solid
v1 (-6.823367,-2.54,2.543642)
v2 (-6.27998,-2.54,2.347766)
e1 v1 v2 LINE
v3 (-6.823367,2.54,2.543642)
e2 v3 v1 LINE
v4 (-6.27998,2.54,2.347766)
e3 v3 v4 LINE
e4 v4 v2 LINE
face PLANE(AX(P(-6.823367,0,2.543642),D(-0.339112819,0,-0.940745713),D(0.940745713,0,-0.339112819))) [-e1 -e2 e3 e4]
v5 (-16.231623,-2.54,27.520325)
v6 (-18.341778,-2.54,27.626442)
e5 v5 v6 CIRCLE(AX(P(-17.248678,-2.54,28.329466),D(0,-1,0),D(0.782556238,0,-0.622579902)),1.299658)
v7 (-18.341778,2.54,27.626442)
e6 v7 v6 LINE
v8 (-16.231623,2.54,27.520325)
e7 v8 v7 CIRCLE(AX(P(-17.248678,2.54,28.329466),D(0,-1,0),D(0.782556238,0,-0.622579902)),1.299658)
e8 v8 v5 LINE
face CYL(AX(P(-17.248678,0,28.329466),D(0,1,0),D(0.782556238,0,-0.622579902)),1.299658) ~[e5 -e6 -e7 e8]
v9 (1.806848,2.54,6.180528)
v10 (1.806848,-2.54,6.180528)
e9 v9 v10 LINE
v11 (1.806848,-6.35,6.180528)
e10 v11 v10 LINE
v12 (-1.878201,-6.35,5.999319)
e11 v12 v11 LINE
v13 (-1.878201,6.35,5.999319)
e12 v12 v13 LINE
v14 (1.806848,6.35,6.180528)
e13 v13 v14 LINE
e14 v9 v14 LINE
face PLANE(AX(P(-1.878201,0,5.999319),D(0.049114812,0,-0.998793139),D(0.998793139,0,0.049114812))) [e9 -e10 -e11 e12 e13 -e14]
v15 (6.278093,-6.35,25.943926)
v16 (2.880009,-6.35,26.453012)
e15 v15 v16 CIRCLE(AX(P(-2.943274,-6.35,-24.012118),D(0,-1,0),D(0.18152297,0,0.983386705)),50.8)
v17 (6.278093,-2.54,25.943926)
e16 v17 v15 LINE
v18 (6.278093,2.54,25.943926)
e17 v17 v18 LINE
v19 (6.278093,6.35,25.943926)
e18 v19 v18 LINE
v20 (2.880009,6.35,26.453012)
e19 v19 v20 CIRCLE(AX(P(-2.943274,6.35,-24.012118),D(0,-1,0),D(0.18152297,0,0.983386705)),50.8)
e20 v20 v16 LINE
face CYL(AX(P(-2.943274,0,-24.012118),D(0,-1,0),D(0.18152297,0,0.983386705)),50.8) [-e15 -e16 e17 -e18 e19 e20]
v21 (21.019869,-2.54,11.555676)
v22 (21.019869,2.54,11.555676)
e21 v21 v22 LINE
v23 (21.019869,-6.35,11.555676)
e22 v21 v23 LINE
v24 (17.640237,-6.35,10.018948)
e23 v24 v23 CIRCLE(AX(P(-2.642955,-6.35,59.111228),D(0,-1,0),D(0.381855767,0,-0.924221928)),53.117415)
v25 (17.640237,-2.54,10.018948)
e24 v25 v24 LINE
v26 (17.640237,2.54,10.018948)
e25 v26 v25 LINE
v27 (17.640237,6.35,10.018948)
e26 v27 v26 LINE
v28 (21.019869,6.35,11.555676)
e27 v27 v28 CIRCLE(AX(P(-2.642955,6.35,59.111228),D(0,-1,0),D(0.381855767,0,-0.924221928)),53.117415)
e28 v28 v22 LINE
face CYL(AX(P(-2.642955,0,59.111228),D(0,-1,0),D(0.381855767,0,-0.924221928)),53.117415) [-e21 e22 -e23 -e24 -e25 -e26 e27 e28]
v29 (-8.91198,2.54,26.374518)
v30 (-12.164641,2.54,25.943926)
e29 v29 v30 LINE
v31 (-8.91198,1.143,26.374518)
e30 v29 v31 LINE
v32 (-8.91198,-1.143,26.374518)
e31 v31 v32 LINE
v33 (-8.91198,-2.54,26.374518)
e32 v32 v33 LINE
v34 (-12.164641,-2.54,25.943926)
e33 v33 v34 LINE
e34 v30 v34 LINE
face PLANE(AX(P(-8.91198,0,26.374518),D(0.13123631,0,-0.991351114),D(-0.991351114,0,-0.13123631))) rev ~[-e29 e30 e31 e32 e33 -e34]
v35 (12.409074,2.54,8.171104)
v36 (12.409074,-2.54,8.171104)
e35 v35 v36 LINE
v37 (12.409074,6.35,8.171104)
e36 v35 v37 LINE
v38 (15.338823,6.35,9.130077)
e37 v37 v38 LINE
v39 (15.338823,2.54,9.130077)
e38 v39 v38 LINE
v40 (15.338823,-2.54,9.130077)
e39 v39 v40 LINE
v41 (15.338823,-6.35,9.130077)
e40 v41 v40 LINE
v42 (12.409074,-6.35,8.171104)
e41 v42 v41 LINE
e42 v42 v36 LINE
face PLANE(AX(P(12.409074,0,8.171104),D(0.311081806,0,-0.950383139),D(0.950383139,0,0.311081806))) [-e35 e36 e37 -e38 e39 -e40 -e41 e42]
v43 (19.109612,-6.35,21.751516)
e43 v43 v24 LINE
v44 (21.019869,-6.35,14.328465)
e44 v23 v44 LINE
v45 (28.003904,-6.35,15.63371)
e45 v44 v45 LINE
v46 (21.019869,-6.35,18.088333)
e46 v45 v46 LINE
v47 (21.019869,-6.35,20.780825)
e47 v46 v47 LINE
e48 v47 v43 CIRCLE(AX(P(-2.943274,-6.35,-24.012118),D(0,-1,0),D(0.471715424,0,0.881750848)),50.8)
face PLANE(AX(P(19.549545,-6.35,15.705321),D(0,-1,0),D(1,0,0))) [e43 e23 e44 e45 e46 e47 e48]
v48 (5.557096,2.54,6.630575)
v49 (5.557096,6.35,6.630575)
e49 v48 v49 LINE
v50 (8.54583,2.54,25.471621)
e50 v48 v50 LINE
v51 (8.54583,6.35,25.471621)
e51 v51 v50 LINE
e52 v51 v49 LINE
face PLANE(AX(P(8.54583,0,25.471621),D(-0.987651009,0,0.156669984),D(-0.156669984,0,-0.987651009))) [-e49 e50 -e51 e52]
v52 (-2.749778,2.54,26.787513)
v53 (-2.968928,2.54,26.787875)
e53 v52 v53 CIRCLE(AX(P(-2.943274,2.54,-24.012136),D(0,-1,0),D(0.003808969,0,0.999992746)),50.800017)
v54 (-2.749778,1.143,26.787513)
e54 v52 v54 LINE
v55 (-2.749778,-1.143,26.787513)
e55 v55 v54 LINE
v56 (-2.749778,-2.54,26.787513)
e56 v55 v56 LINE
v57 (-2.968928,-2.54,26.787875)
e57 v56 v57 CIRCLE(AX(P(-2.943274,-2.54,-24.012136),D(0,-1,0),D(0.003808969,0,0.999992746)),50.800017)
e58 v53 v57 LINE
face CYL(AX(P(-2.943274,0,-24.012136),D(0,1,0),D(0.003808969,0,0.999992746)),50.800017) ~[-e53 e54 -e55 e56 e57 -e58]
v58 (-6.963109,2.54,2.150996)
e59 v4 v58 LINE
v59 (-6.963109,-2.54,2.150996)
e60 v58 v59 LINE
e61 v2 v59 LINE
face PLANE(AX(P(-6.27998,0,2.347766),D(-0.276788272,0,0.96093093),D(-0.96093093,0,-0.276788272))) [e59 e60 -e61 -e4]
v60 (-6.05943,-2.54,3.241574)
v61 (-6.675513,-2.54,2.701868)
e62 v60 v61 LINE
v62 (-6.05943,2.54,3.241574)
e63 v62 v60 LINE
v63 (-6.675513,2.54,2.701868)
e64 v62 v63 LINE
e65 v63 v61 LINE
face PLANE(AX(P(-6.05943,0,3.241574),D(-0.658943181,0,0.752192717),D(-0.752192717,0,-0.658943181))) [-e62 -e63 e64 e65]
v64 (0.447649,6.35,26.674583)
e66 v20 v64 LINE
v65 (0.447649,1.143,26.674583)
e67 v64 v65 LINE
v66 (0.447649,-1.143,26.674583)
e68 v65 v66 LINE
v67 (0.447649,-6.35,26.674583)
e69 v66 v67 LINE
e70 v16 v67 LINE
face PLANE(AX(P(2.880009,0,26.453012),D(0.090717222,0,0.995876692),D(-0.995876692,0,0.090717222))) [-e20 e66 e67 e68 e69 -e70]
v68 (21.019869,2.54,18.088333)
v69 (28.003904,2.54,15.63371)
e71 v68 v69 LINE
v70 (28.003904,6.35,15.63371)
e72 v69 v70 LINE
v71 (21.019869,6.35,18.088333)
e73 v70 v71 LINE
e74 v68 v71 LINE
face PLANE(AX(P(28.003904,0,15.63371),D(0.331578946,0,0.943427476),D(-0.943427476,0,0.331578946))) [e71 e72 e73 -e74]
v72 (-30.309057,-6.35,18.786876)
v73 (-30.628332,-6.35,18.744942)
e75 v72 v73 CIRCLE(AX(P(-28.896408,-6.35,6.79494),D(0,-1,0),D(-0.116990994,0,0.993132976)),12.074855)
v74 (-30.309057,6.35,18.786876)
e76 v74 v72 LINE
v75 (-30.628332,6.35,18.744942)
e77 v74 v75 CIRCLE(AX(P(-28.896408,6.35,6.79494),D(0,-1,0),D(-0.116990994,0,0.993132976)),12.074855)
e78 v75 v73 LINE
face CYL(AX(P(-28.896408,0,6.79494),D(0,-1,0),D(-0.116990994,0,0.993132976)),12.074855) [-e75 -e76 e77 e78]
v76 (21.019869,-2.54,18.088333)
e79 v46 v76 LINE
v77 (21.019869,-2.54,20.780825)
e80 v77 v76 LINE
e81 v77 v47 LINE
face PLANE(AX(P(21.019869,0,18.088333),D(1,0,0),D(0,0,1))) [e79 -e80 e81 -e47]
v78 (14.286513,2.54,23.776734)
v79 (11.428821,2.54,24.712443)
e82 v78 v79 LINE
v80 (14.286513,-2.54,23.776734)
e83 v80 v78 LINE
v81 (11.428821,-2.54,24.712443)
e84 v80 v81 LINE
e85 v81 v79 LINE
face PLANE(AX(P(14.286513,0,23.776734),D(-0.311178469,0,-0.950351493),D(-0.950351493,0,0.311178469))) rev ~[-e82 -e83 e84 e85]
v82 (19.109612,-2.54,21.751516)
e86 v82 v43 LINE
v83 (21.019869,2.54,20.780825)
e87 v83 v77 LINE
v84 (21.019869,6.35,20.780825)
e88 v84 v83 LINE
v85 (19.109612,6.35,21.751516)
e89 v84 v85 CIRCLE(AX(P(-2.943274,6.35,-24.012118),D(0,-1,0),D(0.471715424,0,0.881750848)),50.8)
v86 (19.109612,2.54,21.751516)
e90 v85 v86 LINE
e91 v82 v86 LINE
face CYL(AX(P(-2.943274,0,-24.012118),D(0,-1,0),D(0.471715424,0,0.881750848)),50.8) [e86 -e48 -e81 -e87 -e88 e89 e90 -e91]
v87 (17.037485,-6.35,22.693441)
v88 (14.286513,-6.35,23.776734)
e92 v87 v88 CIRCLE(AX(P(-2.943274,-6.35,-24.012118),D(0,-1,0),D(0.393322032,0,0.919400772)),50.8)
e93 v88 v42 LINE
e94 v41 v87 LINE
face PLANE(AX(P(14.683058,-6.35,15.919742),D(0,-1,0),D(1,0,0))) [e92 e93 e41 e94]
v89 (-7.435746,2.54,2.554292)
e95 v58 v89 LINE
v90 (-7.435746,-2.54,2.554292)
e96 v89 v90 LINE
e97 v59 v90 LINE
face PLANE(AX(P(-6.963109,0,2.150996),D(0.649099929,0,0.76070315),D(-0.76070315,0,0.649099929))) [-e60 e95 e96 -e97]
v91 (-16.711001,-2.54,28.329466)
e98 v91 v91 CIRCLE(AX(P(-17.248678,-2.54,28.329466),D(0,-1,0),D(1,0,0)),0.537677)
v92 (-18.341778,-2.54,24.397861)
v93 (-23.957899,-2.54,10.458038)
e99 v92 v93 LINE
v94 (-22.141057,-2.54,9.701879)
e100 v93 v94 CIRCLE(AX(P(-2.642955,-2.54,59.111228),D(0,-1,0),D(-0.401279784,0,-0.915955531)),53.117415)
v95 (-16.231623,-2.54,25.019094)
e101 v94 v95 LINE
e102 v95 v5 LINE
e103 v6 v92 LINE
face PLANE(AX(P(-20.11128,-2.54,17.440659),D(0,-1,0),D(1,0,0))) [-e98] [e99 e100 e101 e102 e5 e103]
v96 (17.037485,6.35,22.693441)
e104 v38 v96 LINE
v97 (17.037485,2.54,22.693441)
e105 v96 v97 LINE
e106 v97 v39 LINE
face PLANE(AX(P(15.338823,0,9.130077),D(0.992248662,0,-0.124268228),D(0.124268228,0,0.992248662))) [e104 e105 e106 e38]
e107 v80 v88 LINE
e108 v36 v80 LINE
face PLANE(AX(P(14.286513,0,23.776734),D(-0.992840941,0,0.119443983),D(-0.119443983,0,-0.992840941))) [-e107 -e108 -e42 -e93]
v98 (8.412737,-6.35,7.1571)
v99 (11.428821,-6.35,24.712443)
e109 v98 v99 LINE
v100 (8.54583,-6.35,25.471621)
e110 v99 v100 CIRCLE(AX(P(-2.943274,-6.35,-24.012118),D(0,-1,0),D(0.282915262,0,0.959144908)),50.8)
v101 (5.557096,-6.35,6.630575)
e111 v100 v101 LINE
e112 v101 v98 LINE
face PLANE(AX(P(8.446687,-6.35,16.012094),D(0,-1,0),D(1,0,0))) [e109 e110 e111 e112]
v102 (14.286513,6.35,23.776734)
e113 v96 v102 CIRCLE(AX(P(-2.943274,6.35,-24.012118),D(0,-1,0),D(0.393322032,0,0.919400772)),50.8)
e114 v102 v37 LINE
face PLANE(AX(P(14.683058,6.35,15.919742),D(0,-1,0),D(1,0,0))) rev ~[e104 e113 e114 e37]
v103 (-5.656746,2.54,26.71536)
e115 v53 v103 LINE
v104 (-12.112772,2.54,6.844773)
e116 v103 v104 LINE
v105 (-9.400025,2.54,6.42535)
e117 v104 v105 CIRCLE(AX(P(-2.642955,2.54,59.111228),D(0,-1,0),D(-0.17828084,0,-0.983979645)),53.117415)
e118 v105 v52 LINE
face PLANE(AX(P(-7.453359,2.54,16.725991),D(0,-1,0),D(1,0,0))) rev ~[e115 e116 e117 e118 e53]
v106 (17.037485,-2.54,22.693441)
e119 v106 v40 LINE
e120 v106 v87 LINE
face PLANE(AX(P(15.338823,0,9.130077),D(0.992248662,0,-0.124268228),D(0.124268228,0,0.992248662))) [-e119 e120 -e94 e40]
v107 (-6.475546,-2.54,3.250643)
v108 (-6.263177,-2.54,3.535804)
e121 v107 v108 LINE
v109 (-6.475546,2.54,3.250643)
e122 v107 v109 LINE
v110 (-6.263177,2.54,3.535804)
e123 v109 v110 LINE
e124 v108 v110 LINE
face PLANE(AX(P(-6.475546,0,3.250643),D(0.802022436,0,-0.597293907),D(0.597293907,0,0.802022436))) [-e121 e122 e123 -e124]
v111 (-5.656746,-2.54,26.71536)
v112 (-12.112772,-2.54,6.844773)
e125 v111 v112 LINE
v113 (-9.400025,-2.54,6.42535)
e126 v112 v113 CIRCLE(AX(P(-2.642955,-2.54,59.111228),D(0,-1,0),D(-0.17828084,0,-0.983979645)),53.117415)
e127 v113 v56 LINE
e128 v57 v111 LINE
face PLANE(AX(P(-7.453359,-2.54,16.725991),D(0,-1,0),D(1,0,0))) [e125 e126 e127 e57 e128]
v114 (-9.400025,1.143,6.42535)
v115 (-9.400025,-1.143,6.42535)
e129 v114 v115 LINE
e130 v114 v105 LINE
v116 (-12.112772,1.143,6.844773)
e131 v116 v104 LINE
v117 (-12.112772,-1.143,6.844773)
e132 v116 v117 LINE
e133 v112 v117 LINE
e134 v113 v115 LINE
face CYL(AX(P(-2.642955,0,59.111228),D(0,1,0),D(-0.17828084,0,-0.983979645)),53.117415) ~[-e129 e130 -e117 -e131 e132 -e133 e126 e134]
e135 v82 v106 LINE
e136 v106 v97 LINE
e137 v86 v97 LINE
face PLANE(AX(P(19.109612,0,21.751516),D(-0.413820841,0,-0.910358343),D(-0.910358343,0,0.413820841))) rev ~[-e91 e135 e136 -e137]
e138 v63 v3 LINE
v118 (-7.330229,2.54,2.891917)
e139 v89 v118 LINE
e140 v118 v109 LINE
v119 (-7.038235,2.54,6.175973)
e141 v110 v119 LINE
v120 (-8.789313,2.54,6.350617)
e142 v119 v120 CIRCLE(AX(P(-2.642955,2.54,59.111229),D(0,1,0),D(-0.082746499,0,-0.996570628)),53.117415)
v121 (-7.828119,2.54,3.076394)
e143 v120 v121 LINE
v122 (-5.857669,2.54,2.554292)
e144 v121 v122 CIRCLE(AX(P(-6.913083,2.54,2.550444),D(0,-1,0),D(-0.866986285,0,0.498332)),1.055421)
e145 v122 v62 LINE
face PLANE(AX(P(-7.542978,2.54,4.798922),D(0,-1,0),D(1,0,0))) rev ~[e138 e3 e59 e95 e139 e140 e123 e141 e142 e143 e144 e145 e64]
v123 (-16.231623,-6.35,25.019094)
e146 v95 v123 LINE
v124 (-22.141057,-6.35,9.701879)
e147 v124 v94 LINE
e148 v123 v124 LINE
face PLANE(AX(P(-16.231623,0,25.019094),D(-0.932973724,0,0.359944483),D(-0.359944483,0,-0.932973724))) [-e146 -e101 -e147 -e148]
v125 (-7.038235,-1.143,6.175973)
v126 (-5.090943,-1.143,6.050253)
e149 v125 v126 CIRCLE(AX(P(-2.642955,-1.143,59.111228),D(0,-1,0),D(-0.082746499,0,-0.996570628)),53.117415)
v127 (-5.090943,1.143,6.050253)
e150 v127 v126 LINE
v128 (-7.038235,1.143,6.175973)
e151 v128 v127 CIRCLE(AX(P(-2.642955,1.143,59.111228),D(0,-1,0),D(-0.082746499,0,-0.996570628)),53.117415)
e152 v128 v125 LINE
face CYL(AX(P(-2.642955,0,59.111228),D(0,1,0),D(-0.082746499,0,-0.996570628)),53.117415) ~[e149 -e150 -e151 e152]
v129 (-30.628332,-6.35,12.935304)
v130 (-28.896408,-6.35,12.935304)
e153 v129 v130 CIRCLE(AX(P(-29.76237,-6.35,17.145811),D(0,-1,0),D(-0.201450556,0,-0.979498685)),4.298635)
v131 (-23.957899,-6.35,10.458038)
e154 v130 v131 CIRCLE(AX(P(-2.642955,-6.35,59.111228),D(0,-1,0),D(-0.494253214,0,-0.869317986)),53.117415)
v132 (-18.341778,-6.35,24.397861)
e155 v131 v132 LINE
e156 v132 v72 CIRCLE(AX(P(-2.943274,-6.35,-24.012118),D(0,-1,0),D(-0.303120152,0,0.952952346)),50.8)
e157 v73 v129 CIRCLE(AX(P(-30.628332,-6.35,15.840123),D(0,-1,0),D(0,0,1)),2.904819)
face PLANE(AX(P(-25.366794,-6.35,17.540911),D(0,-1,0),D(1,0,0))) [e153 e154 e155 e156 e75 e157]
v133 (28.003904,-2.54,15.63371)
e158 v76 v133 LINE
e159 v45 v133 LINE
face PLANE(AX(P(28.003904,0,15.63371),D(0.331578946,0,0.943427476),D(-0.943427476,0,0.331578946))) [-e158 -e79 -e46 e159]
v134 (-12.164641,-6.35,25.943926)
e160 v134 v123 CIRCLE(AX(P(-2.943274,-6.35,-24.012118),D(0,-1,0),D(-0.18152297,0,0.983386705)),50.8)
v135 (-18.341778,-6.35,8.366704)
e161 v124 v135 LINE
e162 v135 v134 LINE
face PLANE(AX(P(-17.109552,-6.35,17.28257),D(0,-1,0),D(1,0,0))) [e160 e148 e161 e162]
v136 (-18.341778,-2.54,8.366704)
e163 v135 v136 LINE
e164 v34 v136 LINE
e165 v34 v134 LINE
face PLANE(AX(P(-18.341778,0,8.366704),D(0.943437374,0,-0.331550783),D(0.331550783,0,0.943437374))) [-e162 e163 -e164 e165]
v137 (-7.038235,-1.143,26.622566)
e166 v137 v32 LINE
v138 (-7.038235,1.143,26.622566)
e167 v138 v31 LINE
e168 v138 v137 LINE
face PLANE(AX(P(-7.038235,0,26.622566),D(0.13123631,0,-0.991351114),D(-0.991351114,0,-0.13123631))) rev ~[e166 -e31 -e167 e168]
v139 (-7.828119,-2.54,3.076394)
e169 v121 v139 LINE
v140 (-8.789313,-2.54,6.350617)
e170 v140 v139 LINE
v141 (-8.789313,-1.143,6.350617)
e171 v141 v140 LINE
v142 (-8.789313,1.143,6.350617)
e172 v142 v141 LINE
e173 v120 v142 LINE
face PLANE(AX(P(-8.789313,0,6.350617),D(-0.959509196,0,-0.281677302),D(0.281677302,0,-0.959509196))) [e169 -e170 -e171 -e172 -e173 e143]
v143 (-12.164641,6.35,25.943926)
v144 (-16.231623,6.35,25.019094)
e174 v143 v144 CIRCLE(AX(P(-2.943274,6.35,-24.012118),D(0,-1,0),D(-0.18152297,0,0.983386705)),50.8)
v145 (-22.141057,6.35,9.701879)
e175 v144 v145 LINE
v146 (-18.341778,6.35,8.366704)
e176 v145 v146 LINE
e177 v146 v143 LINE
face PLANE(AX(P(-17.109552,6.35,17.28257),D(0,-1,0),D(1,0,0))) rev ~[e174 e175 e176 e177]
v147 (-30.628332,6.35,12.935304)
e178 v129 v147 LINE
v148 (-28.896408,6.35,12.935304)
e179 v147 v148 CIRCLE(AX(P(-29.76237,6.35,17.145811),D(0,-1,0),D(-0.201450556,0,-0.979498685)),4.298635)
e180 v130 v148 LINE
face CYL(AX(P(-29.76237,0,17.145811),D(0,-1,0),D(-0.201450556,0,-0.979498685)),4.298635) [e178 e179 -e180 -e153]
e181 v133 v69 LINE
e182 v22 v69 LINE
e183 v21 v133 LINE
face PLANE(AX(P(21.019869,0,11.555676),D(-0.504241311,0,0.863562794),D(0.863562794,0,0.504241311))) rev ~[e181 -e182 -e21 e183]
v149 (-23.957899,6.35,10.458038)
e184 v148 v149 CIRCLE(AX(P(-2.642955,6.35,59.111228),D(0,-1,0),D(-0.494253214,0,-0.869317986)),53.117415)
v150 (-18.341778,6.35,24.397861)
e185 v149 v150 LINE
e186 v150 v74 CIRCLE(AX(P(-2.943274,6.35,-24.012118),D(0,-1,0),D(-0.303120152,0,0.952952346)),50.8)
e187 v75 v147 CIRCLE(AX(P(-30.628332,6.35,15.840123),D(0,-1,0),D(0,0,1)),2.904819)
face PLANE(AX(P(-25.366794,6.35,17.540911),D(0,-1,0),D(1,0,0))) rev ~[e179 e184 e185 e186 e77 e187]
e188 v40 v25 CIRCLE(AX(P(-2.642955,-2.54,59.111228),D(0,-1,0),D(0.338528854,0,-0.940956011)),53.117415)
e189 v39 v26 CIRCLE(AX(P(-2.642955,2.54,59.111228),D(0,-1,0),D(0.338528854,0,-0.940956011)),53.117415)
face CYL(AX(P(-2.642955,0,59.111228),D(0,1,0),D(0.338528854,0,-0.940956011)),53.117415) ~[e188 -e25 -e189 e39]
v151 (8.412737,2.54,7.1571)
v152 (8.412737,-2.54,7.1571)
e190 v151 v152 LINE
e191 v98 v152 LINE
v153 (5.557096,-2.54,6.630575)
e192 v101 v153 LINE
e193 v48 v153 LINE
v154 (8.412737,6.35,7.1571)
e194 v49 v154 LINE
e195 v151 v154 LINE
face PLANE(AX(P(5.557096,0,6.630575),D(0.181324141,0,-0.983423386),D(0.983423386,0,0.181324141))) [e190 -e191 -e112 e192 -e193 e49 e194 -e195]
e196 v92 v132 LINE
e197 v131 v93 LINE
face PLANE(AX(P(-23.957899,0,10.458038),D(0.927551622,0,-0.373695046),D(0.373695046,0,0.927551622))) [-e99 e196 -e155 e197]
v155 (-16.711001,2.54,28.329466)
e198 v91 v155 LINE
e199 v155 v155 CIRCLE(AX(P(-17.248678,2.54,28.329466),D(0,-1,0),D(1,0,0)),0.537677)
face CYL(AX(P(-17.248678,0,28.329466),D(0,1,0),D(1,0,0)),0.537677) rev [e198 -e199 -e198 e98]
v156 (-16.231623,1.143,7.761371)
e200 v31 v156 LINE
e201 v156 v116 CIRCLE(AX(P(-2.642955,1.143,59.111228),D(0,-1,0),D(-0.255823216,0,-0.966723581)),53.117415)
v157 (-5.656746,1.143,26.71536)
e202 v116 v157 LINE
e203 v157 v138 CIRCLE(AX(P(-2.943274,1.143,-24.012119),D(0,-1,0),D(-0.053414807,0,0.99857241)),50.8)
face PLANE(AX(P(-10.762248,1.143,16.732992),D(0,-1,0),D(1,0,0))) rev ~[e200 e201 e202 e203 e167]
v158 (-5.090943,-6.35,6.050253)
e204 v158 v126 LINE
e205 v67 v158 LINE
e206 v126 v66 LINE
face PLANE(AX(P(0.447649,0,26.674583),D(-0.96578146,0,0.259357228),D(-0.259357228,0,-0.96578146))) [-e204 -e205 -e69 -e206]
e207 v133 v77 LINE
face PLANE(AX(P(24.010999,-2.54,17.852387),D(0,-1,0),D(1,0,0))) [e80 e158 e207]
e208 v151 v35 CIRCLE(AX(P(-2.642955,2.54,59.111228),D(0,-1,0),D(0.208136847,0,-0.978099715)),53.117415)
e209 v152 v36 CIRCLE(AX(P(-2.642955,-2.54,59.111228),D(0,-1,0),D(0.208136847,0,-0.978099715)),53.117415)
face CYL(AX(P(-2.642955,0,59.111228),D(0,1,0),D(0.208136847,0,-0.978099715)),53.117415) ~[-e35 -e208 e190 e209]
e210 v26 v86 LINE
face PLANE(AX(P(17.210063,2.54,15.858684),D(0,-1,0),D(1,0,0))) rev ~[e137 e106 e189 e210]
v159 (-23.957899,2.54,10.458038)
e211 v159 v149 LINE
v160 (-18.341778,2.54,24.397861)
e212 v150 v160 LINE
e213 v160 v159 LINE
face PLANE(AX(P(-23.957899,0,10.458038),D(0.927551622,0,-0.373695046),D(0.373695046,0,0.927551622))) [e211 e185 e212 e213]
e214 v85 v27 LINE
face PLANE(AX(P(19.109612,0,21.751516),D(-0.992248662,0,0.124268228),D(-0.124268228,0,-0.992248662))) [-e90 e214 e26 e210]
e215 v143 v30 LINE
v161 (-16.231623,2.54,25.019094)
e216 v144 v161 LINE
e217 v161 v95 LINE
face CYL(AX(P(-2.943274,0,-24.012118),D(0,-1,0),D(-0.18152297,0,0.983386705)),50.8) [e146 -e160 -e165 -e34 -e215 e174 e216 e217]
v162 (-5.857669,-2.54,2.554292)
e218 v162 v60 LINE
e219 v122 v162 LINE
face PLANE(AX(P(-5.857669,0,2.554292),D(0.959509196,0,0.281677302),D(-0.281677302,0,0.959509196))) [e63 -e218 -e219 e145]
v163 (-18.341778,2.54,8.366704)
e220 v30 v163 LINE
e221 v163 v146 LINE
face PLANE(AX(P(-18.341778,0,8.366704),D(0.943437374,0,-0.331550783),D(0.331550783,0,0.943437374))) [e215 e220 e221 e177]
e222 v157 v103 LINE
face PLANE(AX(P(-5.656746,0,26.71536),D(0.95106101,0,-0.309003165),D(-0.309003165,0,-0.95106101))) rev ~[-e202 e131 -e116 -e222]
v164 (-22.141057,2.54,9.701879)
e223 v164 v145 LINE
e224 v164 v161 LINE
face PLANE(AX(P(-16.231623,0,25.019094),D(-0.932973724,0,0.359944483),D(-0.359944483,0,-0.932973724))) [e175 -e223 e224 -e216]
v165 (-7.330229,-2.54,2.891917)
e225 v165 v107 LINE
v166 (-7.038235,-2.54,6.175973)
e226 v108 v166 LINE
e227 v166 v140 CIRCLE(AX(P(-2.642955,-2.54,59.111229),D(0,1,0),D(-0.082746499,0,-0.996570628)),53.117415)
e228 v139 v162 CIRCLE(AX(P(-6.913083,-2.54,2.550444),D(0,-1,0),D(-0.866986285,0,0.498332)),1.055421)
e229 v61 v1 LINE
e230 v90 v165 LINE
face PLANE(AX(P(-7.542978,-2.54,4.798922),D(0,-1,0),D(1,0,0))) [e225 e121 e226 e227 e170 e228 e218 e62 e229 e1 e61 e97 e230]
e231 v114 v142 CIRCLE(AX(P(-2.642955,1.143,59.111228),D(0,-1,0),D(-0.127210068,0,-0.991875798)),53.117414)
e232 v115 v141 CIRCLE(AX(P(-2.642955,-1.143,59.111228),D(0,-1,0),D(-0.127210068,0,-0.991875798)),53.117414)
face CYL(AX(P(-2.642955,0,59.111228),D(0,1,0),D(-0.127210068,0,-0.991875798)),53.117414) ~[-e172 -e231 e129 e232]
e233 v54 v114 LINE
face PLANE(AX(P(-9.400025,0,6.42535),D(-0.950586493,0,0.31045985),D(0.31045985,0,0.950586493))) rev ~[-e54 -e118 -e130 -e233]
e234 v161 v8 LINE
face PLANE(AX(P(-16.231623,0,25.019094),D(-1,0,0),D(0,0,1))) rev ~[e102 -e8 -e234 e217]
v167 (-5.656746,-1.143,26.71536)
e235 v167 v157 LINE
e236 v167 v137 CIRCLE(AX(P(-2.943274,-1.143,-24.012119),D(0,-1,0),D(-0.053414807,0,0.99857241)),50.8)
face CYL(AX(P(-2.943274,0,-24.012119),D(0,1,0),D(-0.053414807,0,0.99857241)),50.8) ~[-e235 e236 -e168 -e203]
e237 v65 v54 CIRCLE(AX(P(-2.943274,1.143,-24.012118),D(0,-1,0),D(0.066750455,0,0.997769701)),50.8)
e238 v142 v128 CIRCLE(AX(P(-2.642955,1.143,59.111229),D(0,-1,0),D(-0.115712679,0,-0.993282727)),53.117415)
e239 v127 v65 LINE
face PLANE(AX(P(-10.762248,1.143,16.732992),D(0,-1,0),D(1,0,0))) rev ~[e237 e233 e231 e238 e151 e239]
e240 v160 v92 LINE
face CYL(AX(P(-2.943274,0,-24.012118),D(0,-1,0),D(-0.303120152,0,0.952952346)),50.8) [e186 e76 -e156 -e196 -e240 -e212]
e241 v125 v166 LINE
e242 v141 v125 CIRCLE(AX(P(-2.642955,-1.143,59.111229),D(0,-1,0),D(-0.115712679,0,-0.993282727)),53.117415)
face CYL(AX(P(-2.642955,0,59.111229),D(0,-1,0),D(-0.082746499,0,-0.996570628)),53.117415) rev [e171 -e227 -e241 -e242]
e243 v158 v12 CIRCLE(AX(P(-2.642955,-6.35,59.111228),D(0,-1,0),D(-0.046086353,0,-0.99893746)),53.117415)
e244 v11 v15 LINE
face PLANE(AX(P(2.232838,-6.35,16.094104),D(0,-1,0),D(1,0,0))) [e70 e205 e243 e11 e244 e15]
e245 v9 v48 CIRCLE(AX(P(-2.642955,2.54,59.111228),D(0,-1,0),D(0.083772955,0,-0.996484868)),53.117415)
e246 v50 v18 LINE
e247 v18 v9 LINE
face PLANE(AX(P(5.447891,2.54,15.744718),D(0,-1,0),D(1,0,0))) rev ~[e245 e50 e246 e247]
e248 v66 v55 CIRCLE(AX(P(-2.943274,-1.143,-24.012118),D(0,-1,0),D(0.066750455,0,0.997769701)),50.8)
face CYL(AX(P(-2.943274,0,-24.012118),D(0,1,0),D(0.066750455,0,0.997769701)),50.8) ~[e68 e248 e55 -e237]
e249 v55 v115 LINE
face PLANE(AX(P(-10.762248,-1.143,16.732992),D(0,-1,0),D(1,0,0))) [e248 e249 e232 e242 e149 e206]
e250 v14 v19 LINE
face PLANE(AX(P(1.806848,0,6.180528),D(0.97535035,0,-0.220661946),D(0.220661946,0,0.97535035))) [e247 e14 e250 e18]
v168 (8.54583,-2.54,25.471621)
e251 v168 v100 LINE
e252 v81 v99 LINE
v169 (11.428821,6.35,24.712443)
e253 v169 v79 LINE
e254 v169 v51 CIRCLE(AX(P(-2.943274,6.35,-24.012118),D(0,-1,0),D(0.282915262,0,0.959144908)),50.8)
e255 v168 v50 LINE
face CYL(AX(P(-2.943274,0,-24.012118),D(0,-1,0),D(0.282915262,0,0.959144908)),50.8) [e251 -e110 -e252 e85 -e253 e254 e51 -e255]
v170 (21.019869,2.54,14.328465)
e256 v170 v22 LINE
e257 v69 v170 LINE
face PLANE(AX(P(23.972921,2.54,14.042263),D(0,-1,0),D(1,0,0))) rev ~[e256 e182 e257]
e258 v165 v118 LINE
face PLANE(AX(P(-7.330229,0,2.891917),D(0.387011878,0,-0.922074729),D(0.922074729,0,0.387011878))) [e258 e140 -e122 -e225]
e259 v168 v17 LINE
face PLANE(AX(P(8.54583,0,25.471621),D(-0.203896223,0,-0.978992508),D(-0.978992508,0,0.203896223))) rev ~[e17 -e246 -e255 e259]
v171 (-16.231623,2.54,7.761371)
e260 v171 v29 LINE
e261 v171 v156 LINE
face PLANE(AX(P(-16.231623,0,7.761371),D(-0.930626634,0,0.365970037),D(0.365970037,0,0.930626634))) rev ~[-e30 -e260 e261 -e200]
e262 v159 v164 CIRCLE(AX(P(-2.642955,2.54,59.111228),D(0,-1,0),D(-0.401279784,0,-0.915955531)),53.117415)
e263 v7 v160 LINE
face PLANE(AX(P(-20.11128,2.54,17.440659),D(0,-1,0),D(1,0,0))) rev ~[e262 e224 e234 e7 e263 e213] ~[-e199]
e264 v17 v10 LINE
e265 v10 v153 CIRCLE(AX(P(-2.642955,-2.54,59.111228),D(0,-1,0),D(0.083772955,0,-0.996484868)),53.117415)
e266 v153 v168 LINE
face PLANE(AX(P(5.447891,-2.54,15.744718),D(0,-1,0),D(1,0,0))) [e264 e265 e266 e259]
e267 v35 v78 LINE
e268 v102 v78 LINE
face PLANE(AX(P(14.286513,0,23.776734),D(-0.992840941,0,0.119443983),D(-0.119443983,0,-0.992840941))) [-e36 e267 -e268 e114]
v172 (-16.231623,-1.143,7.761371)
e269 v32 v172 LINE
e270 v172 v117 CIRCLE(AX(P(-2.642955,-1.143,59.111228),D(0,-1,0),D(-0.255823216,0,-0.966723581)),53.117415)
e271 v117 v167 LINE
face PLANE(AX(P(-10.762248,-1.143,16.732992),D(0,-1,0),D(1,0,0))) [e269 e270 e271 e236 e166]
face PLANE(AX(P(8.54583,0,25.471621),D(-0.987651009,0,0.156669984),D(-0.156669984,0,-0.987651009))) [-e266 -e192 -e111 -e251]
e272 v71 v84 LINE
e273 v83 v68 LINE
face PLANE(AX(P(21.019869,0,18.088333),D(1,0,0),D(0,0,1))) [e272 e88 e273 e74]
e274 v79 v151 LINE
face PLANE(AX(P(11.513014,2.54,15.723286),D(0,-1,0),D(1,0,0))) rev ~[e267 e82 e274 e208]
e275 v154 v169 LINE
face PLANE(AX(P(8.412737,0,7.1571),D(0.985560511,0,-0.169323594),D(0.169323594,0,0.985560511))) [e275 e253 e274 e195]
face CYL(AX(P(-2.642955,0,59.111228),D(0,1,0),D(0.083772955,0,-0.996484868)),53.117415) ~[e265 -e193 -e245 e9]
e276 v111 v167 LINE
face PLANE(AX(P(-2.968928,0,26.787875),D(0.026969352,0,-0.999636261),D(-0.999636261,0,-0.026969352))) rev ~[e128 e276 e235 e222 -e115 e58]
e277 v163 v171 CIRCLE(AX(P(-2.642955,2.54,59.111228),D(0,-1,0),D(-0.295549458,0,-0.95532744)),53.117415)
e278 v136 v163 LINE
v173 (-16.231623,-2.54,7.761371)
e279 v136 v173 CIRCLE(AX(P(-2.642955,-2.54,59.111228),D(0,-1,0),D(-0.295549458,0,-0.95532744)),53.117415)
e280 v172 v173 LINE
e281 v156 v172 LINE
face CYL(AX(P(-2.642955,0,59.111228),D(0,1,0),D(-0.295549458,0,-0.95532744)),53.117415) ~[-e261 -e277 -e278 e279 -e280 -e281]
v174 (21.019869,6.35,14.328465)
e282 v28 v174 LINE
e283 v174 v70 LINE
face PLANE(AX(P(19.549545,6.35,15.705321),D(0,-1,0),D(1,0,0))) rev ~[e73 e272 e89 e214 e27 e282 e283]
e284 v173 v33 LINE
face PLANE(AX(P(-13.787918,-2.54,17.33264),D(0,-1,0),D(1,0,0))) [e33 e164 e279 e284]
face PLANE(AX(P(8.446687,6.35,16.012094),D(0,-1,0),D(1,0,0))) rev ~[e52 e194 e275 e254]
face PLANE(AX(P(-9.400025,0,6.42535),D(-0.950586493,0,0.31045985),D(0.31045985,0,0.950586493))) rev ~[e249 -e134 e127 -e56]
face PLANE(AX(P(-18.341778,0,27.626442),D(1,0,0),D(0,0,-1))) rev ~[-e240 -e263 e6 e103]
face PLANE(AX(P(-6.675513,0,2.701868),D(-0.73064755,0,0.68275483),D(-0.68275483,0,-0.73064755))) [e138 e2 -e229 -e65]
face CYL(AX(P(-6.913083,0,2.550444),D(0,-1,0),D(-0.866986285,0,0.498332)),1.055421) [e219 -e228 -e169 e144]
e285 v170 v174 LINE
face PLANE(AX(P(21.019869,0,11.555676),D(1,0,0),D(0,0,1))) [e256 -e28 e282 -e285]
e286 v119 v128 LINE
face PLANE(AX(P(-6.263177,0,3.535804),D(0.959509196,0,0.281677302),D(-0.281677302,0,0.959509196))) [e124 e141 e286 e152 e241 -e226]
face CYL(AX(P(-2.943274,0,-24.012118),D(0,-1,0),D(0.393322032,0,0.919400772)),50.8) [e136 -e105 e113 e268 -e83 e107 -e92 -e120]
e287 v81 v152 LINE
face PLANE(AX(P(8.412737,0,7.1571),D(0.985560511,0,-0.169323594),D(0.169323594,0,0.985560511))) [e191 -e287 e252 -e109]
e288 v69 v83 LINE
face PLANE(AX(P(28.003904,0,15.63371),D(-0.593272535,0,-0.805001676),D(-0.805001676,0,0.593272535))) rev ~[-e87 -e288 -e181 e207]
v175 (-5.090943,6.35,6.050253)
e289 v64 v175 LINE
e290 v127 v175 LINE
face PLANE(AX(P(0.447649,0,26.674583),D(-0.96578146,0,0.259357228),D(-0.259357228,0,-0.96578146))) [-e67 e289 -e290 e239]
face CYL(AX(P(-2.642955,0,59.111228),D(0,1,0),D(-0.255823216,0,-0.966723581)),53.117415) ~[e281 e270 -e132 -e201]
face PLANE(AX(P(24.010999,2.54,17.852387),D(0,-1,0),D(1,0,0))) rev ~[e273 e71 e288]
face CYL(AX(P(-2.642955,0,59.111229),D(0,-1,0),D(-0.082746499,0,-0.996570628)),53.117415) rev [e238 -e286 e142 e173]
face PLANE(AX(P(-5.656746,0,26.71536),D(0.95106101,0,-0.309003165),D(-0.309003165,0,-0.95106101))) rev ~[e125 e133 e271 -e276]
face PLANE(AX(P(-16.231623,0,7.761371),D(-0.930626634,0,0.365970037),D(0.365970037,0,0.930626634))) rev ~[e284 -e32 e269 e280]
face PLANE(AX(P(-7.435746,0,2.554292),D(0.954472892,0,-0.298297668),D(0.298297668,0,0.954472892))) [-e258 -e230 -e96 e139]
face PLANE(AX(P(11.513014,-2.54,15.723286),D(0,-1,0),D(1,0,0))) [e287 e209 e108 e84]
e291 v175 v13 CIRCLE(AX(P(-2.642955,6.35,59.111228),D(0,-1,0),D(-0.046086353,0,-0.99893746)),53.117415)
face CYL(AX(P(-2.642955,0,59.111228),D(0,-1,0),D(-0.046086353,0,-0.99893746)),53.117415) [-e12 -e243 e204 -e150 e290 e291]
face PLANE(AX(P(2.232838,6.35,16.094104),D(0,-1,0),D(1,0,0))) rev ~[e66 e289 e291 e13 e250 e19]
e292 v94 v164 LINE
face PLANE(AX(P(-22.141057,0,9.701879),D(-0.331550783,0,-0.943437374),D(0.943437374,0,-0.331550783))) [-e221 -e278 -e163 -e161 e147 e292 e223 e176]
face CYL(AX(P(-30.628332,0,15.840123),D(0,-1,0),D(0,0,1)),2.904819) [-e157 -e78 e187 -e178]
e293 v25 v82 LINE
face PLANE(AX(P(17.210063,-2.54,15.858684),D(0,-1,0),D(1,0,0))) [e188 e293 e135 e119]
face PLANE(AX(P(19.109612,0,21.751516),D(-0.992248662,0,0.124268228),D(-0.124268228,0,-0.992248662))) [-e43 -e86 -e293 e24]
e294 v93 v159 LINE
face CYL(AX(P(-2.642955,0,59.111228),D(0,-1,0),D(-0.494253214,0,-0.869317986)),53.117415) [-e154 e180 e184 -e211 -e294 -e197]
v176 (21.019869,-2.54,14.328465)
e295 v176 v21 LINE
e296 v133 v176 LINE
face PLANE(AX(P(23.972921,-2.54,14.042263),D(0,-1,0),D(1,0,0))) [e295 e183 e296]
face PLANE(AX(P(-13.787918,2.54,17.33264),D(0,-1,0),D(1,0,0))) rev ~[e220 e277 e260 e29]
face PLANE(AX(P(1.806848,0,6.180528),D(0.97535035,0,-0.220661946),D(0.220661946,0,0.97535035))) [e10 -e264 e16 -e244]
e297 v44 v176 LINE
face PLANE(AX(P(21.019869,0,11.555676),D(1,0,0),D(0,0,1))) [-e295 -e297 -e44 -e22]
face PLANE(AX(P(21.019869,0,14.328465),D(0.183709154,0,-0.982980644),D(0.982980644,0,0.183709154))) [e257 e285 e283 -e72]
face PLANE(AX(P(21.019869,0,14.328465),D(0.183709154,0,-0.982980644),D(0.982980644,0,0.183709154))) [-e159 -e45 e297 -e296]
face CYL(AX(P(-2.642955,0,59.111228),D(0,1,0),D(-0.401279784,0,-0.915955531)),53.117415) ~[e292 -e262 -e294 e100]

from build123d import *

# Parameters (mm, degrees)
F1_DEPTH = 6.35
F2_DEPTH = 1.143
F0_R     = 0.5376774343
F3_DEPTH = 2.54


# Not quite as in the source:
# - a feature names something its author has since deleted; it is built from what else it names


with BuildPart() as f1:
    # F0 (on Front) → F1 (new body, symmetric)
    with BuildSketch(Plane.XZ):
        with BuildLine():
            Line((-23.957899441, 10.4580381471), (-18.3417778462, 24.3978608632))
            ThreePointArc((-18.3417778462, 24.3978608632), (-24.508682548, 21.9832418882), (-30.3090570475, 18.7868761299))
            ThreePointArc((-30.3090570475, 18.7868761299), (-30.4688345425, 18.7669734191), (-30.6283324456, 18.7449419699))
            ThreePointArc((-30.6283324456, 18.7449419699), (-33.5331514259, 15.8401229896), (-30.6283324456, 12.9353040093))
            ThreePointArc((-30.6283324456, 12.9353040093), (-29.7623700905, 12.8471763438), (-28.8964077355, 12.9353040093))
            ThreePointArc((-28.8964077355, 12.9353040093), (-26.4593844973, 11.6324177359), (-23.957899441, 10.4580381471))
        make_face()
    extrude(amount=F1_DEPTH, both=True)



with BuildPart() as f1b:
    # F0 (on Front) → F1, piece 2 (new body, symmetric)
    with BuildSketch(Plane.XZ):
        with BuildLine():
            Line((-18.3417778462, 8.3667041198), (-12.1646409942, 25.9439263056))
            ThreePointArc((-12.1646409942, 25.9439263056), (-14.2076271577, 25.5232665303), (-16.2316225469, 25.0190941641))
            Line((-16.2316225469, 25.0190941641), (-22.1410569955, 9.7018790977))
            Line((-22.1410569955, 9.7018790977), (-18.3417778462, 8.3667041198))
        make_face()
    extrude(amount=F1_DEPTH, both=True)


with BuildPart() as f1c:
    # F0 (on Front) → F1, piece 3 (new body, symmetric)
    with BuildSketch(Plane.XZ):
        with BuildLine():
            Line((1.8068482134, 6.1805279437), (6.278092768, 25.9439263056))
            ThreePointArc((6.278092768, 25.9439263056), (4.5833562732, 26.2272072808), (2.8800089407, 26.4530119809))
            Line((2.8800089407, 26.4530119809), (-1.8782013648, 5.999318733))
            Line((-1.8782013648, 5.999318733), (1.8068482134, 6.1805279437))
        make_face()
        with BuildLine():
            Line((-1.8782013648, 5.999318733), (2.8800089407, 26.4530119809))
            Line((2.8800089407, 26.4530119809), (0.4476490102, 26.6745825214))
            Line((0.4476490102, 26.6745825214), (-5.0909425313, 6.0502526163))
            ThreePointArc((-5.0909425313, 6.0502526163), (-3.4849571687, 6.0004872294), (-1.8782013648, 5.999318733))
        make_face()
    extrude(amount=F1_DEPTH, both=True)


with BuildPart() as f1d:
    # F0 (on Front) → F1, piece 4 (new body, symmetric)
    with BuildSketch(Plane.XZ):
        with BuildLine():
            Line((8.4127366642, 7.1570997269), (11.4288211982, 24.7124430234))
            ThreePointArc((11.4288211982, 24.7124430234), (9.992896211, 25.1131857412), (8.5458304529, 25.4716212117))
            Line((8.5458304529, 25.4716212117), (5.5570962218, 6.6305751818))
            Line((5.5570962218, 6.6305751818), (8.4127366642, 7.1570997269))
        make_face()
    extrude(amount=F1_DEPTH, both=True)


with BuildPart() as f1e:
    # F0 (on Front) → F1, piece 5 (new body, symmetric)
    with BuildSketch(Plane.XZ):
        with BuildLine():
            Line((15.3388230563, 9.1300772804), (17.0374851182, 22.6934409017))
            ThreePointArc((17.0374851182, 22.6934409017), (15.6698818595, 23.2551052755), (14.2865132328, 23.7767342476))
            Line((14.2865132328, 23.7767342476), (12.4090739429, 8.1711044117))
            Line((12.4090739429, 8.1711044117), (15.3388230563, 9.1300772804))
        make_face()
    extrude(amount=F1_DEPTH, both=True)


with BuildPart() as f1f:
    # F0 (on Front) → F1, piece 6 (new body, symmetric)
    with BuildSketch(Plane.XZ):
        with BuildLine():
            Line((21.0198694331, 18.0883333087), (21.0198694322, 20.7808247964))
            ThreePointArc((21.0198694322, 20.7808247964), (20.069859076, 21.2762433466), (19.1096116707, 21.7515160445))
            Line((19.1096116707, 21.7515160445), (17.6402366731, 10.0189484933))
            ThreePointArc((17.6402366731, 10.0189484933), (19.3434832269, 10.757776133), (21.0198694351, 11.5556761172))
            Line((21.0198694351, 11.5556761172), (21.0198694343, 14.3284648657))
            Line((21.0198694343, 14.3284648657), (21.0198694331, 18.0883333087))
        make_face()
        Polygon((21.0198694343, 14.3284648657), (28.0039037731, 15.6337103452), (21.0198694331, 18.0883333087), align=None)
    extrude(amount=F1_DEPTH, both=True)


with BuildPart() as f1_1:
    add(f1.part)

    add(f1b.part)  # F2 merges F1b

    add(f1c.part)  # F2 merges F1c

    add(f1d.part)  # F2 merges F1d

    add(f1e.part)  # F2 merges F1e

    add(f1f.part)  # F2 merges F1f
    # F0 (on Front) → F2 (join, symmetric)
    with BuildSketch(Plane.XZ):
        with BuildLine():
            Line((-12.1127719974, 6.8447730539), (-5.6567463208, 26.7153601349))
            ThreePointArc((-5.6567463208, 26.7153601349), (-6.3478066879, 26.6736702184), (-7.0382347309, 26.6225664263))
            Line((-7.0382347309, 26.6225664263), (-8.9119801903, 26.3745176413))
            Line((-8.9119801903, 26.3745176413), (-16.2316225469, 7.7613705689))
            ThreePointArc((-16.2316225469, 7.7613705689), (-14.1813025903, 7.2621558762), (-12.1127719974, 6.8447730539))
        make_face()
        with BuildLine():
            Line((-5.0909425313, 6.0502526163), (0.4476490102, 26.6745825214))
            ThreePointArc((0.4476490102, 26.6745825214), (-1.1501754418, 26.7562261377), (-2.7497784488, 26.787513187))
            Line((-2.7497784488, 26.787513187), (-9.4000246121, 6.4253498282))
            ThreePointArc((-9.4000246121, 6.4253498282), (-9.0947770245, 6.3870993561), (-8.7893130258, 6.3506173901))
            ThreePointArc((-8.7893130258, 6.3506173901), (-7.91449717, 6.2560428931), (-7.0382347309, 6.1759725811))
            ThreePointArc((-7.0382347309, 6.1759725811), (-6.0651659933, 6.1041697642), (-5.0909425313, 6.0502526163))
        make_face()
        with BuildLine():
            Line((-9.4000246121, 6.4253498282), (-2.7497784488, 26.787513187))
            ThreePointArc((-2.7497784488, 26.787513187), (-2.8593531847, 26.7878123797), (-2.968928311, 26.7878752202))
            Line((-2.968928311, 26.7878752202), (-5.6567463208, 26.7153601349))
            Line((-5.6567463208, 26.7153601349), (-12.1127719974, 6.8447730539))
            ThreePointArc((-12.1127719974, 6.8447730539), (-10.7591081046, 6.6175349855), (-9.4000246121, 6.4253498282))
        make_face()
        with BuildLine():
            ThreePointArc((-18.3417778462, 8.3667041198), (-17.2898277228, 8.0531349816), (-16.2316225469, 7.7613705689))
            Line((-16.2316225469, 7.7613705689), (-8.9119801903, 26.3745176413))
            Line((-8.9119801903, 26.3745176413), (-12.1646409942, 25.9439263056))
            Line((-12.1646409942, 25.9439263056), (-18.3417778462, 8.3667041198))
        make_face()
        with BuildLine():
            Line((5.5570962218, 6.6305751818), (8.5458304529, 25.4716212117))
            Line((8.5458304529, 25.4716212117), (6.278092768, 25.9439263056))
            Line((6.278092768, 25.9439263056), (1.8068482134, 6.1805279437))
            ThreePointArc((1.8068482134, 6.1805279437), (3.6859738146, 6.3722062161), (5.5570962218, 6.6305751818))
        make_face()
        with BuildLine():
            Line((12.4090739429, 8.1711044117), (14.2865132328, 23.7767342476))
            Line((14.2865132328, 23.7767342476), (11.4288211982, 24.7124430234))
            Line((11.4288211982, 24.7124430234), (8.4127366642, 7.1570997269))
            ThreePointArc((8.4127366642, 7.1570997269), (10.4207473928, 7.62531299), (12.4090739429, 8.1711044117))
        make_face()
        with BuildLine():
            Line((17.6402366731, 10.0189484933), (19.1096116707, 21.7515160445))
            Line((19.1096116707, 21.7515160445), (17.0374851182, 22.6934409017))
            Line((17.0374851182, 22.6934409017), (15.3388230563, 9.1300772804))
            ThreePointArc((15.3388230563, 9.1300772804), (16.4946911486, 9.5611495909), (17.6402366731, 10.0189484933))
        make_face()
        with BuildLine():
            Line((-22.1410569955, 9.7018790977), (-16.2316225469, 25.0190941641))
            ThreePointArc((-16.2316225469, 25.0190941641), (-17.2900631098, 24.7199003867), (-18.3417778462, 24.3978608632))
            Line((-18.3417778462, 24.3978608632), (-23.957899441, 10.4580381471))
            ThreePointArc((-23.957899441, 10.4580381471), (-23.0529803303, 10.0715440095), (-22.1410569955, 9.7018790977))
        make_face()
    extrude(amount=F2_DEPTH, both=True)

    # F0 (on Front) → F3 (join, symmetric)
    with BuildSketch(Plane.XZ):
        with BuildLine():
            Line((-22.1410569955, 9.7018790977), (-16.2316225469, 25.0190941641))
            ThreePointArc((-16.2316225469, 25.0190941641), (-17.2900631098, 24.7199003867), (-18.3417778462, 24.3978608632))
            Line((-18.3417778462, 24.3978608632), (-23.957899441, 10.4580381471))
            ThreePointArc((-23.957899441, 10.4580381471), (-23.0529803303, 10.0715440095), (-22.1410569955, 9.7018790977))
        make_face()
        with BuildLine():
            ThreePointArc((-18.3417778462, 8.3667041198), (-17.2898277228, 8.0531349816), (-16.2316225469, 7.7613705689))
            Line((-16.2316225469, 7.7613705689), (-8.9119801903, 26.3745176413))
            Line((-8.9119801903, 26.3745176413), (-12.1646409942, 25.9439263056))
            Line((-12.1646409942, 25.9439263056), (-18.3417778462, 8.3667041198))
        make_face()
        with BuildLine():
            Line((-9.4000246121, 6.4253498282), (-2.7497784488, 26.787513187))
            ThreePointArc((-2.7497784488, 26.787513187), (-2.8593531847, 26.7878123797), (-2.968928311, 26.7878752202))
            Line((-2.968928311, 26.7878752202), (-5.6567463208, 26.7153601349))
            Line((-5.6567463208, 26.7153601349), (-12.1127719974, 6.8447730539))
            ThreePointArc((-12.1127719974, 6.8447730539), (-10.7591081046, 6.6175349855), (-9.4000246121, 6.4253498282))
        make_face()
        with BuildLine():
            Line((5.5570962218, 6.6305751818), (8.5458304529, 25.4716212117))
            Line((8.5458304529, 25.4716212117), (6.278092768, 25.9439263056))
            Line((6.278092768, 25.9439263056), (1.8068482134, 6.1805279437))
            ThreePointArc((1.8068482134, 6.1805279437), (3.6859738146, 6.3722062161), (5.5570962218, 6.6305751818))
        make_face()
        with BuildLine():
            Line((12.4090739429, 8.1711044117), (14.2865132328, 23.7767342476))
            Line((14.2865132328, 23.7767342476), (11.4288211982, 24.7124430234))
            Line((11.4288211982, 24.7124430234), (8.4127366642, 7.1570997269))
            ThreePointArc((8.4127366642, 7.1570997269), (10.4207473928, 7.62531299), (12.4090739429, 8.1711044117))
        make_face()
        with BuildLine():
            Line((17.6402366731, 10.0189484933), (19.1096116707, 21.7515160445))
            Line((19.1096116707, 21.7515160445), (17.0374851182, 22.6934409017))
            Line((17.0374851182, 22.6934409017), (15.3388230563, 9.1300772804))
            ThreePointArc((15.3388230563, 9.1300772804), (16.4946911486, 9.5611495909), (17.6402366731, 10.0189484933))
        make_face()
        Polygon((28.0039037731, 15.6337103452), (21.0198694322, 20.7808247964), (21.0198694331, 18.0883333087), align=None)
        Polygon((21.0198694351, 11.5556761172), (28.0039037731, 15.6337103452), (21.0198694343, 14.3284648657), align=None)
        with BuildLine():
            ThreePointArc((-18.3417778462, 24.3978608632), (-17.2900631098, 24.7199003867), (-16.2316225469, 25.0190941641))
            Line((-16.2316225469, 25.0190941641), (-16.2316225469, 27.5203254709))
            Line((-16.2316225469, 27.5203254709), (-18.3417778462, 27.6264417917))
            Line((-18.3417778462, 27.6264417917), (-18.3417778462, 24.3978608632))
        make_face()
        with BuildLine():
            Line((-18.3417778462, 27.6264417917), (-16.2316225469, 27.5203254709))
            ThreePointArc((-16.2316225469, 27.5203254709), (-17.1834027814, 29.6274841361), (-18.3417778462, 27.6264417917))
        make_face()
        with Locations((-17.248678008, 28.3294664105)):
            Circle(F0_R, mode=Mode.SUBTRACT)
        with BuildLine():
            Line((-6.263176576, 3.5358044787), (-7.0382347309, 6.1759725811))
            ThreePointArc((-7.0382347309, 6.1759725811), (-7.91449717, 6.2560428931), (-8.7893130258, 6.3506173901))
            Line((-8.7893130258, 6.3506173901), (-7.8281190425, 3.0763937997))
            Line((-7.8281190425, 3.0763937997), (-6.263176576, 3.5358044787))
        make_face()
        with BuildLine():
            Line((-6.4755459316, 3.2506433781), (-6.263176576, 3.5358044787))
            Line((-6.263176576, 3.5358044787), (-7.8281190425, 3.0763937997))
            ThreePointArc((-7.8281190425, 3.0763937997), (-7.1834055221, 1.5302282542), (-5.857669426, 2.5542923249))
            Line((-5.857669426, 2.5542923249), (-6.0594304827, 3.2415737925))
            Line((-6.0594304827, 3.2415737925), (-6.6755125299, 2.7018676046))
            Line((-6.6755125299, 2.7018676046), (-6.8233669735, 2.54364172))
            Line((-6.8233669735, 2.54364172), (-6.2799803729, 2.3477658746))
            Line((-6.2799803729, 2.3477658746), (-6.9631087507, 2.1509963489))
            Line((-6.9631087507, 2.1509963489), (-7.4357455596, 2.5542923249))
            Line((-7.4357455596, 2.5542923249), (-7.3302290402, 2.8919170145))
            Line((-7.3302290402, 2.8919170145), (-6.4755459316, 3.2506433781))
        make_face()
    extrude(amount=F3_DEPTH, both=True)


solid = f1_1.part
